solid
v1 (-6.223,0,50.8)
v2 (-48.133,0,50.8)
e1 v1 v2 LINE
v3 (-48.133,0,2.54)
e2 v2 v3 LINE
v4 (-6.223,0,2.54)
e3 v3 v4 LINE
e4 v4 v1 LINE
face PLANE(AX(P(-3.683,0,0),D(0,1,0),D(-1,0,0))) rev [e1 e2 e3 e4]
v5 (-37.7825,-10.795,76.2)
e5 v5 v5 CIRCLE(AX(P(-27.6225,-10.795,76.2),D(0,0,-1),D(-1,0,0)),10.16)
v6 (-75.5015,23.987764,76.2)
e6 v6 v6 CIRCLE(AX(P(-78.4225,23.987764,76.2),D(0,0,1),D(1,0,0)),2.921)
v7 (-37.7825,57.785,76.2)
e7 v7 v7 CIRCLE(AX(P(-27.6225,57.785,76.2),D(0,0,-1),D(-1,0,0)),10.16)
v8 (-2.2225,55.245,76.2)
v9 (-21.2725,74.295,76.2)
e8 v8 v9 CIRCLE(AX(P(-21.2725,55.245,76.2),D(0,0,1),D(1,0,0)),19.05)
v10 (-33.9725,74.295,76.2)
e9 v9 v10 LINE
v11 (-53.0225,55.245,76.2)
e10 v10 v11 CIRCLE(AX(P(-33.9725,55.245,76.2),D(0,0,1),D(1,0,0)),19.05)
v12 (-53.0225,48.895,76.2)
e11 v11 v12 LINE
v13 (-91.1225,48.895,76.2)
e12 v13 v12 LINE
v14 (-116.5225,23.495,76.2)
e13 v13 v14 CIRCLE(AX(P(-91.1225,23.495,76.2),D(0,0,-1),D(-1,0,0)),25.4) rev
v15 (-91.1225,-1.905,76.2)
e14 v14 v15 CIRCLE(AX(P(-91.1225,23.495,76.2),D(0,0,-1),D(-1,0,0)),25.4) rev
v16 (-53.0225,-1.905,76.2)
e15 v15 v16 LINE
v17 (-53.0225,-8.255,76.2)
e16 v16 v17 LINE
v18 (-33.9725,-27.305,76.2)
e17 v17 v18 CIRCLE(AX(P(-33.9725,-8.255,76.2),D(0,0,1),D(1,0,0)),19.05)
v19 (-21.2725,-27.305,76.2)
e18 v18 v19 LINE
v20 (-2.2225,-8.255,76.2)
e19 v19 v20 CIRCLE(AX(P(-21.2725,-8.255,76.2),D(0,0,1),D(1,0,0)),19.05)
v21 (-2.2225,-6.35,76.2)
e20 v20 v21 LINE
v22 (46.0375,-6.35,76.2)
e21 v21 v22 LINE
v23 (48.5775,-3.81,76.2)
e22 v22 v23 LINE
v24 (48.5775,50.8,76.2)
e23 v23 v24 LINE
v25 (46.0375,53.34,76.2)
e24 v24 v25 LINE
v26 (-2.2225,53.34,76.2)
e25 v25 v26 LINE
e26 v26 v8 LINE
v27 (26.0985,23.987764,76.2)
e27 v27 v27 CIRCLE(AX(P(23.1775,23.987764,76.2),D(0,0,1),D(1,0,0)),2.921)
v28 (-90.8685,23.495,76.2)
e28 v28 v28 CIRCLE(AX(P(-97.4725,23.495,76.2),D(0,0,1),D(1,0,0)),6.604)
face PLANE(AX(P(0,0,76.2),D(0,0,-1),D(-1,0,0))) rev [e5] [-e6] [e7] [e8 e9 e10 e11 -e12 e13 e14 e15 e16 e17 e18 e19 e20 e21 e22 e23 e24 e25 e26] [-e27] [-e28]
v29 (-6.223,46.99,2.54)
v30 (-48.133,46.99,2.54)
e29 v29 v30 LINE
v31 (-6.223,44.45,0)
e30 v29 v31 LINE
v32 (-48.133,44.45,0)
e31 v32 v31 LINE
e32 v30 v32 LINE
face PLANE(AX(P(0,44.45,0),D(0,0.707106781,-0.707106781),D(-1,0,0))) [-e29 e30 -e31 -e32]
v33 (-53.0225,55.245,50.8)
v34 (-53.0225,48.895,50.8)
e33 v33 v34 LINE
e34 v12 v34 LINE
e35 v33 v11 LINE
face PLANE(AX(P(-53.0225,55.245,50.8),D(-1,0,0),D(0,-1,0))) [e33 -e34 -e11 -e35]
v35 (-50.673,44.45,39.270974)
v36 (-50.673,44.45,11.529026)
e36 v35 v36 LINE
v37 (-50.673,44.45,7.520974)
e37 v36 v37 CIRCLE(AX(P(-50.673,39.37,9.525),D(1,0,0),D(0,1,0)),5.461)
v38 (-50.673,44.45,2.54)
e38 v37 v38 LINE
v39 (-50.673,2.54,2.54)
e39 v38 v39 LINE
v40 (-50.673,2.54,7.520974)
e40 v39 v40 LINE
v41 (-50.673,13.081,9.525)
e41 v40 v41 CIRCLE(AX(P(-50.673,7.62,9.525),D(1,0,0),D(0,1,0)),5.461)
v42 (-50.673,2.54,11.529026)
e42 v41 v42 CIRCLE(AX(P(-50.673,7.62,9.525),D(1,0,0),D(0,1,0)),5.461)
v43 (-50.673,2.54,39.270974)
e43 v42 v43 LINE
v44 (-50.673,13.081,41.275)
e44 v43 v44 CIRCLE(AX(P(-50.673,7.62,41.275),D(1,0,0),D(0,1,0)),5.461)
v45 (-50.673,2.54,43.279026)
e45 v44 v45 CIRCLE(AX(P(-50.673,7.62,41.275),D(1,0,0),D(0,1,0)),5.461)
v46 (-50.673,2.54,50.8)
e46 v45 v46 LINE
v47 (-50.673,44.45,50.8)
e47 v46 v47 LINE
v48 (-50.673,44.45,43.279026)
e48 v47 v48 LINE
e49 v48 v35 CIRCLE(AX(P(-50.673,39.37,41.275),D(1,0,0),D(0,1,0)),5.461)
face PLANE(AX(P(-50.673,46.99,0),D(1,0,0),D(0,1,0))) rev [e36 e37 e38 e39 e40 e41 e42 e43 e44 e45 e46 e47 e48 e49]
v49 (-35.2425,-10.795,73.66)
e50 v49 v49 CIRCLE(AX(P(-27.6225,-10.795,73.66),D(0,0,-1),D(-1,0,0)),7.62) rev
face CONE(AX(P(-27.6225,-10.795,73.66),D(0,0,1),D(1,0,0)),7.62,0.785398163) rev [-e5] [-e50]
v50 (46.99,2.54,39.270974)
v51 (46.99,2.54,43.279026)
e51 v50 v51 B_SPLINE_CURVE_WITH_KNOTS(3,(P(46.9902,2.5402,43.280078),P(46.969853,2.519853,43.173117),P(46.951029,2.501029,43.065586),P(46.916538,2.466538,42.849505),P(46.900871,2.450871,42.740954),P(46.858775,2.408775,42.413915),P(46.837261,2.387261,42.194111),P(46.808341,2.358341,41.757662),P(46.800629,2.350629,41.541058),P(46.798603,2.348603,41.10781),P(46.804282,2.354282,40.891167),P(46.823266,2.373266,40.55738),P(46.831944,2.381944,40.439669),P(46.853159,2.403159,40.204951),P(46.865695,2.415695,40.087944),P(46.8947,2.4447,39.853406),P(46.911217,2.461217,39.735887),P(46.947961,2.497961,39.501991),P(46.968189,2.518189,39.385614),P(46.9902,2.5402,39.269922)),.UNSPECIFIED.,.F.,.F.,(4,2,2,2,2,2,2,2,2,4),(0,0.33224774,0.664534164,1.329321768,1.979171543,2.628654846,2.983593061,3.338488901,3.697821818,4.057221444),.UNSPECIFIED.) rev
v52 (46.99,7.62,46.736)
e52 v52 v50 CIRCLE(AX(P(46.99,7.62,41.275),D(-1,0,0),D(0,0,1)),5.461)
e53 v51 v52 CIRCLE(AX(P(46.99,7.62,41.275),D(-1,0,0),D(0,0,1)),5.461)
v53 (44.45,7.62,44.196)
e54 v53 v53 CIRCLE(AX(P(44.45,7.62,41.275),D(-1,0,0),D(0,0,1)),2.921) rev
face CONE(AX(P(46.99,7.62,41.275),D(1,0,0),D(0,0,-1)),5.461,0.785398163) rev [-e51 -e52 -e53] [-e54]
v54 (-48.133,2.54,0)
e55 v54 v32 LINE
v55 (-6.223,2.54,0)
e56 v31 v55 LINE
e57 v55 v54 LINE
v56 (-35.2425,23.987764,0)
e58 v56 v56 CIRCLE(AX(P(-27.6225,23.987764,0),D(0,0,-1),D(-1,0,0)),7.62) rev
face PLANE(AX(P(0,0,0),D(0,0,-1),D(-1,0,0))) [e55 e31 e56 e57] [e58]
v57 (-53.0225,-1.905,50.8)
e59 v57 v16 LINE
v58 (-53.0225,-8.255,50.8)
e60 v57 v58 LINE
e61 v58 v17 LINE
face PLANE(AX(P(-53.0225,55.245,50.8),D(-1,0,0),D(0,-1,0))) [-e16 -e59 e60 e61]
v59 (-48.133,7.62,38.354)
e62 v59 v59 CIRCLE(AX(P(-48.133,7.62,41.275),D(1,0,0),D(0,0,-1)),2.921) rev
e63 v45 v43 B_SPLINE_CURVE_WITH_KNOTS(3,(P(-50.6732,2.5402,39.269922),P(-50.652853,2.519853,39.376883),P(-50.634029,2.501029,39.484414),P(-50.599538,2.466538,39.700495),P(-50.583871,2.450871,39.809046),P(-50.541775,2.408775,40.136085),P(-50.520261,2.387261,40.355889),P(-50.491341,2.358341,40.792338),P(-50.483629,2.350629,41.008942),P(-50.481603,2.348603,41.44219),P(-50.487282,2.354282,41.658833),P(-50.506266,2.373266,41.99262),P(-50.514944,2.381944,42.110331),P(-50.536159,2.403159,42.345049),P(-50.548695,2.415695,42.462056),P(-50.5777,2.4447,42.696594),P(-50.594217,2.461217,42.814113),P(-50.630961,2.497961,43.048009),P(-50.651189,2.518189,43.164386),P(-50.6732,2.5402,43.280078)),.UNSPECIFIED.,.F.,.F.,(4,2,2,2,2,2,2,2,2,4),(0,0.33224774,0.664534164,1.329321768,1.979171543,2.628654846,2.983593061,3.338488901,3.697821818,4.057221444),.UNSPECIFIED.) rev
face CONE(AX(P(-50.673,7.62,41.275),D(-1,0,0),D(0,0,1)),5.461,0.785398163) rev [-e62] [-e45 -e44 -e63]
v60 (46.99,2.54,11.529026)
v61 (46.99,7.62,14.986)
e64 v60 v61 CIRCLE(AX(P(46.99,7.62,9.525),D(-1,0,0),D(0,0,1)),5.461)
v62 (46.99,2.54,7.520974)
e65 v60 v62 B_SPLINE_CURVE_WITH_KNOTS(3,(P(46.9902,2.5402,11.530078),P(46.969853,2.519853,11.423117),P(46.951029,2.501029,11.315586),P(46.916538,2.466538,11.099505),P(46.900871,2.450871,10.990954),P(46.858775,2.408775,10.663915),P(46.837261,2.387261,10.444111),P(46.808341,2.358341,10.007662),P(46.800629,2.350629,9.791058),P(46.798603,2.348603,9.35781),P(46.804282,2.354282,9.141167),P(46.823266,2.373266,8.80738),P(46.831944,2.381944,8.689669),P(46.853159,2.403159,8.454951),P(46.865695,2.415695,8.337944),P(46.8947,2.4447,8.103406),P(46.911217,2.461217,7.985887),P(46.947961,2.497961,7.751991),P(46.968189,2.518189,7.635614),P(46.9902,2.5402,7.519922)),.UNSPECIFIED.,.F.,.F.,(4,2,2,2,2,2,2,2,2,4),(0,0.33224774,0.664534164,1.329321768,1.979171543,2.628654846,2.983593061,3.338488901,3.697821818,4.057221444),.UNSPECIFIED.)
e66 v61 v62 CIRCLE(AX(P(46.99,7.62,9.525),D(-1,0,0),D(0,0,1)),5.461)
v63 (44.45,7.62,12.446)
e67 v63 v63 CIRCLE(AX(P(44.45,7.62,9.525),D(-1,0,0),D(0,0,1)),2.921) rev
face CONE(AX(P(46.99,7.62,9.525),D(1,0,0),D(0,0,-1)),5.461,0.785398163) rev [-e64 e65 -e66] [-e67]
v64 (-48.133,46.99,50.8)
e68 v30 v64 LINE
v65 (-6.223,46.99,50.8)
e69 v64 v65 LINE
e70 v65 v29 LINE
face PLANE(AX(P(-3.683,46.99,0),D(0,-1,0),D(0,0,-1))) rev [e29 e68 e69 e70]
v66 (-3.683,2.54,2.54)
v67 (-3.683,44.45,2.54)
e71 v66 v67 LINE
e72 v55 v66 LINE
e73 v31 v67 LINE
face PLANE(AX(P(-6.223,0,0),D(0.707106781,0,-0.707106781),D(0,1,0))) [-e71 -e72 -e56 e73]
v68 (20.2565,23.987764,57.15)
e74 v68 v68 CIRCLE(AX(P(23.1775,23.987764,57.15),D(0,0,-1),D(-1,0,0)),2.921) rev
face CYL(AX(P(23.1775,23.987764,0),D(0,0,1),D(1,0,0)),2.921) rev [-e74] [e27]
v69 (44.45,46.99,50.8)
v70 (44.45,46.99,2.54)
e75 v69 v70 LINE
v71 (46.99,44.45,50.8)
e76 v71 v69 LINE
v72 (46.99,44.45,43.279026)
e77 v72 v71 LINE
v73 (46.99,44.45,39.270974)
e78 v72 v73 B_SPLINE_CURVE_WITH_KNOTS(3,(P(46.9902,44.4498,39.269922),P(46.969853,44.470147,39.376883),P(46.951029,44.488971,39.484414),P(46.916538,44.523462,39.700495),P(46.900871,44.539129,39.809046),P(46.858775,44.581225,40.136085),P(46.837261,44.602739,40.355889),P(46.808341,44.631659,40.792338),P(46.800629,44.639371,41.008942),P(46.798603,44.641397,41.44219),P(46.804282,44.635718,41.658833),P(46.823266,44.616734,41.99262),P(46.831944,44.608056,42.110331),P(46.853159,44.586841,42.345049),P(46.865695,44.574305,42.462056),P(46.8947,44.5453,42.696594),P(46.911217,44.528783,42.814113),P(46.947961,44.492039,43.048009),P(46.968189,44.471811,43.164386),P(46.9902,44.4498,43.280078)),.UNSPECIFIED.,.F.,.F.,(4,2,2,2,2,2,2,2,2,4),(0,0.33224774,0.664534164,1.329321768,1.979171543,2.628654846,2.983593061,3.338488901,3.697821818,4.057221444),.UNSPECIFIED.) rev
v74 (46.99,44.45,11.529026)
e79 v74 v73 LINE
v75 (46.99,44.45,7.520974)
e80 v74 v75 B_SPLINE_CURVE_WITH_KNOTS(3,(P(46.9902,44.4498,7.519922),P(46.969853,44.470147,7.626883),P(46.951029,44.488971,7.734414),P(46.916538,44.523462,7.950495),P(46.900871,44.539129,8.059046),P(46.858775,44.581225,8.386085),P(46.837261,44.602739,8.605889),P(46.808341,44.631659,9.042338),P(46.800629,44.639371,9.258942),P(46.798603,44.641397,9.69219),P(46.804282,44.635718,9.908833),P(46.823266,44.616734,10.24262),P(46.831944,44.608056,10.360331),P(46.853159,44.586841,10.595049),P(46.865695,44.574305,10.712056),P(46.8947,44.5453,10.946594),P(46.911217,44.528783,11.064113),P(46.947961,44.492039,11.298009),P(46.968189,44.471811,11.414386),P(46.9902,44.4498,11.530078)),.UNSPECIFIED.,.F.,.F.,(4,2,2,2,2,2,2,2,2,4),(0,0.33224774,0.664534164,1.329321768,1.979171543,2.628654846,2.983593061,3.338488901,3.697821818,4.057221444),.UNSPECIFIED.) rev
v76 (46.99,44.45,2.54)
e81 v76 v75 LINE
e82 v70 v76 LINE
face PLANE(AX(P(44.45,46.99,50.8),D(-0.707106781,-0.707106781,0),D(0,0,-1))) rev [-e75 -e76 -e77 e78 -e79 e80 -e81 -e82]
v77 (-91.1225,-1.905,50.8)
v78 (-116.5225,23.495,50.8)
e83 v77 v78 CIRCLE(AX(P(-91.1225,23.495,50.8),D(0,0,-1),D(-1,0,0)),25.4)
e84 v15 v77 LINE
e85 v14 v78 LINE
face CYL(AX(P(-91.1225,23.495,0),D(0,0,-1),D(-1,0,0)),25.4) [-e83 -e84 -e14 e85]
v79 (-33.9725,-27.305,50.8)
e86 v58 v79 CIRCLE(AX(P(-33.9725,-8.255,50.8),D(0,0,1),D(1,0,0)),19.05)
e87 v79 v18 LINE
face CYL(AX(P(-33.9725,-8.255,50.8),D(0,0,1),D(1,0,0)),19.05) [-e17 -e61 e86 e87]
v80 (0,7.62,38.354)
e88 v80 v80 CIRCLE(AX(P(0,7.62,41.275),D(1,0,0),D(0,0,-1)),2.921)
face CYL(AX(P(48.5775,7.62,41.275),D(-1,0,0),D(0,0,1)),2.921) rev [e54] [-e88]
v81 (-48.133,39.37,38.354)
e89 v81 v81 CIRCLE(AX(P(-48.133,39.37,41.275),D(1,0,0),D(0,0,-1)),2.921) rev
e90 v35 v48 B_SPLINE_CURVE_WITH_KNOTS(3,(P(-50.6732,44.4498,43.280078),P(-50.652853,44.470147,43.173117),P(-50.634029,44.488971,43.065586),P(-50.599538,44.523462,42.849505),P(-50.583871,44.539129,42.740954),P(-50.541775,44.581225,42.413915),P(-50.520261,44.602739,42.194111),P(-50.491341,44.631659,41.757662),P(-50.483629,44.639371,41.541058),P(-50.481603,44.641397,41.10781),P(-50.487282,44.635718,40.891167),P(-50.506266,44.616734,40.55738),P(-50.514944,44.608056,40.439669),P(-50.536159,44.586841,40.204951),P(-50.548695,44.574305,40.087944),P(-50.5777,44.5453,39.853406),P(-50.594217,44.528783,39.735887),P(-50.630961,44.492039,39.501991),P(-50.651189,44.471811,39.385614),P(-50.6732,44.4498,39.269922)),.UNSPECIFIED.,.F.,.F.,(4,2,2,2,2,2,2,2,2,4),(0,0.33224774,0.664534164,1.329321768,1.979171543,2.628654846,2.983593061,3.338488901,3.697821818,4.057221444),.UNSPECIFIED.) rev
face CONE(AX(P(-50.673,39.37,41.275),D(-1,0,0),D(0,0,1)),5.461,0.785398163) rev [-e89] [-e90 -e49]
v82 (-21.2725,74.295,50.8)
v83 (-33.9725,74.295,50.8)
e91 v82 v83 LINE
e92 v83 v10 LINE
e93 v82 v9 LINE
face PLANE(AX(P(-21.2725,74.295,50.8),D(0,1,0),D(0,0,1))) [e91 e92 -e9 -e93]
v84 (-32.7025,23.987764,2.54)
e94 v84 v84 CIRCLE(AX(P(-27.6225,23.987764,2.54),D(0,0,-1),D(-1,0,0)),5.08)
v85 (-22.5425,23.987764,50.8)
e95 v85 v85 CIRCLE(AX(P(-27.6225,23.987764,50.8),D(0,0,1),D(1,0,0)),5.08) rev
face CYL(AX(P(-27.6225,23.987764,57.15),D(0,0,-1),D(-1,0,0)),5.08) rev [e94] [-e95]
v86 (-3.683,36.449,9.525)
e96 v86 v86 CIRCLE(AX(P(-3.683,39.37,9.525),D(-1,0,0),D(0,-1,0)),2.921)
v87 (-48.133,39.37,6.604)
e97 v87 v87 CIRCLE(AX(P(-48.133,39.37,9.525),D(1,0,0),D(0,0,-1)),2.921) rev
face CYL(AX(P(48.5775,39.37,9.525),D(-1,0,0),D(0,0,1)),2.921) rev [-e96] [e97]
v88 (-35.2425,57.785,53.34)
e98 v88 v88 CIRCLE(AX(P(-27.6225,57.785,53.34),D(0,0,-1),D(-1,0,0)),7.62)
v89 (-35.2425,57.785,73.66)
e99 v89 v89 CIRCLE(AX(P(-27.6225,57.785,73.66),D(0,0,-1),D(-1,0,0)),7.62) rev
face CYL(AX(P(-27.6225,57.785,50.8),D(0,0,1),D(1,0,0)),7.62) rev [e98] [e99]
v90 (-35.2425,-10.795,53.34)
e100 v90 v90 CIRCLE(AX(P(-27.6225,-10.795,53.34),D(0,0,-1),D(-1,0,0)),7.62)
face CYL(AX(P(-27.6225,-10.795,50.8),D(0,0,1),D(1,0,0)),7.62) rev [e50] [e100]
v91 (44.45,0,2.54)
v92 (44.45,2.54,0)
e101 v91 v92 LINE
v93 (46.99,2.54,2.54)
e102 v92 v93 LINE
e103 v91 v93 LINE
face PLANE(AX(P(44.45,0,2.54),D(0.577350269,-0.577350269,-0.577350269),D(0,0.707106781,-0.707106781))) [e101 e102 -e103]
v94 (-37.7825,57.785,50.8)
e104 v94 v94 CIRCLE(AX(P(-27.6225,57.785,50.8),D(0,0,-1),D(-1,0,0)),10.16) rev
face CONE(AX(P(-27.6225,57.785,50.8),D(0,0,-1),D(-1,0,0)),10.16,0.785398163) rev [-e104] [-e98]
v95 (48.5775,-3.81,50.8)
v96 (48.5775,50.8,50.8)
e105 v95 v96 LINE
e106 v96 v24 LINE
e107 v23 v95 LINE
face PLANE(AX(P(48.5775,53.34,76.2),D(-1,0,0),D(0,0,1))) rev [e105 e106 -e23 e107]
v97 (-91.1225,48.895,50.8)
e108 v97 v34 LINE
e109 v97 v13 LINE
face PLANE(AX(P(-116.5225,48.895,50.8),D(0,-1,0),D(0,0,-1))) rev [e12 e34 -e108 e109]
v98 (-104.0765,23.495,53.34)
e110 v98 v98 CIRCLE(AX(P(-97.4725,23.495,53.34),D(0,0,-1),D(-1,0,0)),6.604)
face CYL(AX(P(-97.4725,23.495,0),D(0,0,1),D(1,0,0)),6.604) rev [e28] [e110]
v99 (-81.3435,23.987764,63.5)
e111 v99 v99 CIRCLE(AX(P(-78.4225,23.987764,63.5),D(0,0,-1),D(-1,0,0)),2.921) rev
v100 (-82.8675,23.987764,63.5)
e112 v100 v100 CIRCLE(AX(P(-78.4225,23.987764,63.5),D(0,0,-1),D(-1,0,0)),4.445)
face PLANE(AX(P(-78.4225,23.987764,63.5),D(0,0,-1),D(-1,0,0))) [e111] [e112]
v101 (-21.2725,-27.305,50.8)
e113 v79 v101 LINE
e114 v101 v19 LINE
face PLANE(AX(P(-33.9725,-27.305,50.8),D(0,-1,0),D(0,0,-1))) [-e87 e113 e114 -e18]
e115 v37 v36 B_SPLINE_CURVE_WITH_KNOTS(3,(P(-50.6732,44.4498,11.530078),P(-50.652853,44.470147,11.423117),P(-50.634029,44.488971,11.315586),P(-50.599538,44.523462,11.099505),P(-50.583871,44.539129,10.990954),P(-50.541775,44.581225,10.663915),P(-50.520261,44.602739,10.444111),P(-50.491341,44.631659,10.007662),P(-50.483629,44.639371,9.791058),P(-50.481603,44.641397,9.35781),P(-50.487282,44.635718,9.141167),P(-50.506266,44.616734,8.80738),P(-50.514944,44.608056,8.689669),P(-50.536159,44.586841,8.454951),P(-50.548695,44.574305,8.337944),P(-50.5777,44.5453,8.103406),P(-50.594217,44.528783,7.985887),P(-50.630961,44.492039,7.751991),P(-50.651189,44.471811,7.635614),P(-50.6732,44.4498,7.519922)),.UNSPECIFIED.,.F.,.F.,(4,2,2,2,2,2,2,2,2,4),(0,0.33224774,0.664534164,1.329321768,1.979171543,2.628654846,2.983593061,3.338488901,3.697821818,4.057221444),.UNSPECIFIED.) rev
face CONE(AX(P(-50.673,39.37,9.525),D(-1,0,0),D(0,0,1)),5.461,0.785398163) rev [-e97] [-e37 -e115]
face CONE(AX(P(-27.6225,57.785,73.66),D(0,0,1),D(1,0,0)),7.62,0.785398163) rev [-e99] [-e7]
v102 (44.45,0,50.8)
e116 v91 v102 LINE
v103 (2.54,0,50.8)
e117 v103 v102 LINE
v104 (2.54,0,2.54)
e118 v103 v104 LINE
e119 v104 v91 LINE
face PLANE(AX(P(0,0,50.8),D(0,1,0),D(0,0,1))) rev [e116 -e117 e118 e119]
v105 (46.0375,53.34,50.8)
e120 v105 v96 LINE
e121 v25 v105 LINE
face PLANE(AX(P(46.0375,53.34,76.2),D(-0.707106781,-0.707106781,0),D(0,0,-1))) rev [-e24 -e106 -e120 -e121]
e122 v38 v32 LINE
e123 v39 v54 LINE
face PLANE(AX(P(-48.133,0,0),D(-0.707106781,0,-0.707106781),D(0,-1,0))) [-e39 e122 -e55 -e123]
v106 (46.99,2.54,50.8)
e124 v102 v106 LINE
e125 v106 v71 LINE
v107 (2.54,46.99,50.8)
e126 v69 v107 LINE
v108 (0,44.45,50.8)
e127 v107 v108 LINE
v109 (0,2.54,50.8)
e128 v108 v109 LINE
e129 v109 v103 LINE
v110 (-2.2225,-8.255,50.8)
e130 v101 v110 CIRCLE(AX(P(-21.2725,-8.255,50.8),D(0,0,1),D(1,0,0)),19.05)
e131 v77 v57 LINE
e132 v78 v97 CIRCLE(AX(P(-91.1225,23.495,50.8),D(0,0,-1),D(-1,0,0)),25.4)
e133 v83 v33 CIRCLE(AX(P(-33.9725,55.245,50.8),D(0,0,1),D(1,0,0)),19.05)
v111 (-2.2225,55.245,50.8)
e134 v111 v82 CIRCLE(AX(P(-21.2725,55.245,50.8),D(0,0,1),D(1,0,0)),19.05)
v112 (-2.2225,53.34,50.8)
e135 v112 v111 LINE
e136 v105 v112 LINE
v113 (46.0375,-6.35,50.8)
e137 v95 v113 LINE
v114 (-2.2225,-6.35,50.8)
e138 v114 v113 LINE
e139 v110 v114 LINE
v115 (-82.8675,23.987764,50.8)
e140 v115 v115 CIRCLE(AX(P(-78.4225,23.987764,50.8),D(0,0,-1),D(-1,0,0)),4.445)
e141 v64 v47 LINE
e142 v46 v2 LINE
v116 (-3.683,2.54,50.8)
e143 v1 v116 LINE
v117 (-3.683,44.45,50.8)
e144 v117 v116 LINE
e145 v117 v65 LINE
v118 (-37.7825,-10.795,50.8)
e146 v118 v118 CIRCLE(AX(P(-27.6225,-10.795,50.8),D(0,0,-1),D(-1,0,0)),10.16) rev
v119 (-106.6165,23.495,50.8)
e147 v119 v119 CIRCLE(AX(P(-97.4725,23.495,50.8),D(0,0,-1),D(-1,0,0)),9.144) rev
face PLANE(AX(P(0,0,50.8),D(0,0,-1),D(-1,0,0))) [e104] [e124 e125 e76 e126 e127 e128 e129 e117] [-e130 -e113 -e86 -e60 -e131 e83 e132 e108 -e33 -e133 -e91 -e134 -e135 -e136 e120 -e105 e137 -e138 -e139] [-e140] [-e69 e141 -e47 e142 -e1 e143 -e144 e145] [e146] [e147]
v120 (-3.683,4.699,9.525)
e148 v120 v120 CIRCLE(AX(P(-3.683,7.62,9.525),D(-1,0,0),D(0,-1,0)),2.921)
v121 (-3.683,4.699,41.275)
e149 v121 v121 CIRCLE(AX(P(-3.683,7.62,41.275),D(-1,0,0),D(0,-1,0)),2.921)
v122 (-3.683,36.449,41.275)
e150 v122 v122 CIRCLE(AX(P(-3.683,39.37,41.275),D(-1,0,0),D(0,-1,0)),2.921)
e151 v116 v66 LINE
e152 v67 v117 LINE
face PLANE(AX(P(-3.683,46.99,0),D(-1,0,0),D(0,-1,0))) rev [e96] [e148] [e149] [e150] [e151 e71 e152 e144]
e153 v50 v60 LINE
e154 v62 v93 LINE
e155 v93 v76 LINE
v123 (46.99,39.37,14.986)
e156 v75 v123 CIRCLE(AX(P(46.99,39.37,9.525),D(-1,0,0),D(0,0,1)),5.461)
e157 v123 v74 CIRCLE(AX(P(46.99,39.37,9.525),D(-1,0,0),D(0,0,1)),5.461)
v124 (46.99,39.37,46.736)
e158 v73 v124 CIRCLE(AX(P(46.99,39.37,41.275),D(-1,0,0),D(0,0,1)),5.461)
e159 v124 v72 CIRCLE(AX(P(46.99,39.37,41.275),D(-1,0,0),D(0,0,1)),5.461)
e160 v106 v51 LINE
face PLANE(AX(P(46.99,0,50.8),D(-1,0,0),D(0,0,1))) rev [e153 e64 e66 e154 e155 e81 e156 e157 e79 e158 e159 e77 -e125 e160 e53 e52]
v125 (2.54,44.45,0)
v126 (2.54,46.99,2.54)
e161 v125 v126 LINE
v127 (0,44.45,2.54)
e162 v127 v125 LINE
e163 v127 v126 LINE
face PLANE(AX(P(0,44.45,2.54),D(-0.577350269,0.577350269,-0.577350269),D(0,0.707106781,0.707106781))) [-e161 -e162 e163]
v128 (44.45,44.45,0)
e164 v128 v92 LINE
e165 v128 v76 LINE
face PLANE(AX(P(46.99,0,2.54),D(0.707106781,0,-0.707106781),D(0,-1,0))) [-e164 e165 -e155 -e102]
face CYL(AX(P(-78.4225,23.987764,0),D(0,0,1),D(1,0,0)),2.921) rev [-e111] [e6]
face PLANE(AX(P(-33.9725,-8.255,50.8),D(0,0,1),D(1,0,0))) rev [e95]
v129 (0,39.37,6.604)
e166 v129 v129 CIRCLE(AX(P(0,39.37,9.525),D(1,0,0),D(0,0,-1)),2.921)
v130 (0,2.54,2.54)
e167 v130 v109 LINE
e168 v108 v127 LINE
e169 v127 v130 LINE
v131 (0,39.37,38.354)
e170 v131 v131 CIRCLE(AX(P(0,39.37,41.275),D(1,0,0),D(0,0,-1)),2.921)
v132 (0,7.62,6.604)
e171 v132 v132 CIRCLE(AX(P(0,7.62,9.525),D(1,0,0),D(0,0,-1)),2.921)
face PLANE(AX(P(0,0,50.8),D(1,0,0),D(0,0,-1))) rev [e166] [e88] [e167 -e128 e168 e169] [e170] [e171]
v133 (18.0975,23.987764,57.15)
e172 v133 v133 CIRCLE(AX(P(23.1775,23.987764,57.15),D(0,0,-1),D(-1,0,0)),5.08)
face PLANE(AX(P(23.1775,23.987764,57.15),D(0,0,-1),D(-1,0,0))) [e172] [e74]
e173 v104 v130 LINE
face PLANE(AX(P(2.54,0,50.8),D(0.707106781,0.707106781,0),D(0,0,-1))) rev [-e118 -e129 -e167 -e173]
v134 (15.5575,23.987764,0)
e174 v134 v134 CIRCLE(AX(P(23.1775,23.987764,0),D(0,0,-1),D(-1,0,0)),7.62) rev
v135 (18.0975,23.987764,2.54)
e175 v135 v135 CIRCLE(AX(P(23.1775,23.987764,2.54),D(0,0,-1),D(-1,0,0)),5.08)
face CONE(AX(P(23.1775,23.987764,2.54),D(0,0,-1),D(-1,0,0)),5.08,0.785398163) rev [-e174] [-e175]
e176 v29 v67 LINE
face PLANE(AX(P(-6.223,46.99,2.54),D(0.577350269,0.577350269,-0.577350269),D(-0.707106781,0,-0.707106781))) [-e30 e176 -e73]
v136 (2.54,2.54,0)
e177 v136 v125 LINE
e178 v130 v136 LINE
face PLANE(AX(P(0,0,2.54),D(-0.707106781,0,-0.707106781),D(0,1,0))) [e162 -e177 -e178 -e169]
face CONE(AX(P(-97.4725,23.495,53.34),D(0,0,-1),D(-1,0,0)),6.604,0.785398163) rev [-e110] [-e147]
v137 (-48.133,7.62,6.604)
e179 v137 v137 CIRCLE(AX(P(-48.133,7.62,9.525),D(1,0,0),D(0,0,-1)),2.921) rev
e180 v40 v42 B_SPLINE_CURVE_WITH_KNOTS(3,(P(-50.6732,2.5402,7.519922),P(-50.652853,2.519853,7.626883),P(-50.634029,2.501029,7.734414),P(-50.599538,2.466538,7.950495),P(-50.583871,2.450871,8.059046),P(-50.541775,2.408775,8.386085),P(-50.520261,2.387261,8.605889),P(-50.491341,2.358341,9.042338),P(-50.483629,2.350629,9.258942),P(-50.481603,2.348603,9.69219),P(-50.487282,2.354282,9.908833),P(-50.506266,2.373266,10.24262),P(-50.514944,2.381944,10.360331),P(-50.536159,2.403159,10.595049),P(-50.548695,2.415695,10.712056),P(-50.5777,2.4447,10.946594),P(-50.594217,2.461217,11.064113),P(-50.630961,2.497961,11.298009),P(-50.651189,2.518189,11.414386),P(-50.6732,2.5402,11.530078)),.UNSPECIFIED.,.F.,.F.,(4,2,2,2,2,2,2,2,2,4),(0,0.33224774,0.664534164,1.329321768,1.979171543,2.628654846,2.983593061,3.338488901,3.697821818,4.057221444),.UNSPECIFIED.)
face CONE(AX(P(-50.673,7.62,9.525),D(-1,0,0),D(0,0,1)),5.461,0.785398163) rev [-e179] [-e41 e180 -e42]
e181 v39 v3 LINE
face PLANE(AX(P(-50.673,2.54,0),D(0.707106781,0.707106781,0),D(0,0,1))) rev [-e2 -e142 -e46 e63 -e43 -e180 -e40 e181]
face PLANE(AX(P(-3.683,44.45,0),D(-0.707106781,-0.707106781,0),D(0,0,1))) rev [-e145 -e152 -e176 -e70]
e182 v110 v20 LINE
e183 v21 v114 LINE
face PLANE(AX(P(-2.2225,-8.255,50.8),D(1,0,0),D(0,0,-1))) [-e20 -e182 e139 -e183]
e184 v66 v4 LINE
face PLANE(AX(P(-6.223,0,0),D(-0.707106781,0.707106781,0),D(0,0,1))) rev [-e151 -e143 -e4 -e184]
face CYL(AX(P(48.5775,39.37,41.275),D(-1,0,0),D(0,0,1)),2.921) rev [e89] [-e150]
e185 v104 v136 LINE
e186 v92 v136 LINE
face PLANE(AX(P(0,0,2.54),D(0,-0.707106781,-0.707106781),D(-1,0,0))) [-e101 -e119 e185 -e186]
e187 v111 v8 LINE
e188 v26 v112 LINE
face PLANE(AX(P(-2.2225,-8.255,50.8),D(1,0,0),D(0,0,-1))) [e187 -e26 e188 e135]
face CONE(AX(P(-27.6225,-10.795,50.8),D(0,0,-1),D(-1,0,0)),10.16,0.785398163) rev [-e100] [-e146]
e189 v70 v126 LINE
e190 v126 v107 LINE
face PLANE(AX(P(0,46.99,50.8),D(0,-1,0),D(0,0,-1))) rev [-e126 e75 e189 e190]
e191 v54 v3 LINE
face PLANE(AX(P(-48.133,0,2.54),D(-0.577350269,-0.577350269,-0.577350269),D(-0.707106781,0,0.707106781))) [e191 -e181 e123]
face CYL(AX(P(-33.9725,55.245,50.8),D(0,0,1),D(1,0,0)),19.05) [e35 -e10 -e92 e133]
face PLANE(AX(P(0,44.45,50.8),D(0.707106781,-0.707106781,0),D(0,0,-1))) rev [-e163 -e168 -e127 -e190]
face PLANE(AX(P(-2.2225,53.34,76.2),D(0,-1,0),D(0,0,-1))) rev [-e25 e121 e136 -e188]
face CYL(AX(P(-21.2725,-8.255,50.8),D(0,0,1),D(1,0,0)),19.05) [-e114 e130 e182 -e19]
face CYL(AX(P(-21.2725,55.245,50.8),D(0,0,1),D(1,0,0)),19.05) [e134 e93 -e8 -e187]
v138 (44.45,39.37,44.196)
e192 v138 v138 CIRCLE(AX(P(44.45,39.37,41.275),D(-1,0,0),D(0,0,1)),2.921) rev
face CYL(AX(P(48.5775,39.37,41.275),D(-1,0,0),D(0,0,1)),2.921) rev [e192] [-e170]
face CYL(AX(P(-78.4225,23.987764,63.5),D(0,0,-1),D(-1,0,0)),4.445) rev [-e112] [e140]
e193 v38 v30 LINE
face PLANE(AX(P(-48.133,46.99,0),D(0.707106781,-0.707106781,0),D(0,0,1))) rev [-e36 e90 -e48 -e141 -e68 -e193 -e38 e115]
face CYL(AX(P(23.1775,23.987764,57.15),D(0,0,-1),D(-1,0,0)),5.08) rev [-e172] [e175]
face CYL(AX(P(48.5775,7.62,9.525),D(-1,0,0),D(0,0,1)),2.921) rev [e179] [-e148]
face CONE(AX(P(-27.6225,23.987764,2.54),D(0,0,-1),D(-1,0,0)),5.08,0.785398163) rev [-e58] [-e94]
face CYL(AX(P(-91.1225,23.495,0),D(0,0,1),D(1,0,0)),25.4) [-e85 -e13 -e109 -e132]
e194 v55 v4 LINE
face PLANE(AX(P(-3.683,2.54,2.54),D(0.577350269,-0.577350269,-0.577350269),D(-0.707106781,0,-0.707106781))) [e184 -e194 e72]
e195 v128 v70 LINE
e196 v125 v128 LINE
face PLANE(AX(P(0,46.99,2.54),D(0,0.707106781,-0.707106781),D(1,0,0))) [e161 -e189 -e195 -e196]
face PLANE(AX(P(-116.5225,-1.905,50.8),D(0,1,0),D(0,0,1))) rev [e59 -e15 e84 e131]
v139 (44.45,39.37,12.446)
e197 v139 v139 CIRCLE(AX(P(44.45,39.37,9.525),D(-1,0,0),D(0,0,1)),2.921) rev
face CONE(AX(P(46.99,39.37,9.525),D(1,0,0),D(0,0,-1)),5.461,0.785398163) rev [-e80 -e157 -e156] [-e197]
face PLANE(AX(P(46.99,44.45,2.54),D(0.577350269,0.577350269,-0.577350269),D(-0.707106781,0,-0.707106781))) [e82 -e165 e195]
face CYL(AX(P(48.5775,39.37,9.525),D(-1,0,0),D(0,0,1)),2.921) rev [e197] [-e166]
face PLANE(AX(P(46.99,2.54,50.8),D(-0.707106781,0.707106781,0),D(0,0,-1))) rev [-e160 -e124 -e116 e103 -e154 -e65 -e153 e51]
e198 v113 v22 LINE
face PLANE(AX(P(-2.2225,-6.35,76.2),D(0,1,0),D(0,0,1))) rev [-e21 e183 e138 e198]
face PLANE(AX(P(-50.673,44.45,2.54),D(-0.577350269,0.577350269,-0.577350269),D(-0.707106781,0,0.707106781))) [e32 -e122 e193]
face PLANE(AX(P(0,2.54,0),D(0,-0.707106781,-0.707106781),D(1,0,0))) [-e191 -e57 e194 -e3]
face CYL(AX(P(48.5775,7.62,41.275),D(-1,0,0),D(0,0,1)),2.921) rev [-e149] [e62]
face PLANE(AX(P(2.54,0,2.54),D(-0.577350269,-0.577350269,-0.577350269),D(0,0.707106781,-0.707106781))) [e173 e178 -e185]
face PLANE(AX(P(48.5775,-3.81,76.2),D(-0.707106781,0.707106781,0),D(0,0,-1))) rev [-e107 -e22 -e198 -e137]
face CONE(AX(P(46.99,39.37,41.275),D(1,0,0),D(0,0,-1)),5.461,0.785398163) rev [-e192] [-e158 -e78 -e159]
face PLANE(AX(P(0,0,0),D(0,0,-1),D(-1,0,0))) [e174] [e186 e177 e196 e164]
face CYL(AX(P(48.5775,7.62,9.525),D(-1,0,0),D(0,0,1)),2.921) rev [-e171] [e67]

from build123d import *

# Parameters (mm, degrees)
SKETCH1_W               = 46.99
SKETCH1_H               = 46.99
BOSS_EXTRUDE2_DEPTH     = 50.8
SKETCH3_W               = 50.8
SKETCH3_H               = 59.69
BOSS_EXTRUDE3_DEPTH     = 25.4
SKETCH8_W               = 25.4
SKETCH8_H               = 50.8
BOSS_EXTRUDE4_DEPTH     = 114.3
SKETCH9_W               = 46.99
SKETCH9_H               = 46.99
BOSS_EXTRUDE5_DEPTH     = 50.8
CUT_EXTRUDE4_DEPTH      = 150.094227273
CUT_EXTRUDE4_DEPTH_BACK = 150.094227273
SKETCH4_R               = 2.921
SKETCH10_R              = 6.604
CUT_EXTRUDE5_DEPTH      = 150.094227273
FILLET2_R               = 25.4
SKETCH11_R              = 2.921
CUT_EXTRUDE6_DEPTH      = 150.094227273
SKETCH12_R              = 5.08
CUT_EXTRUDE7_DEPTH      = 57.15
SKETCH15_R              = 4.445
CUT_EXTRUDE8_DEPTH      = 12.7
SKETCH16_R              = 7.62
BOSS_EXTRUDE6_DEPTH     = 25.4


# Some blends are built 0.0001 mm under size
with BuildPart() as part:
    # Sketch1 → Boss-Extrude2 (new body)
    with BuildSketch(Plane.XY):
        with Locations((23.495, 23.495)):
            Rectangle(SKETCH1_W, SKETCH1_H)
    extrude(amount=BOSS_EXTRUDE2_DEPTH)

    # Sketch3 → Boss-Extrude3 (add)
    with BuildSketch(Plane.XY.offset(50.8)):
        with Locations((23.1775, 23.495)):
            Rectangle(SKETCH3_W, SKETCH3_H)
    extrude(amount=BOSS_EXTRUDE3_DEPTH)

    # Sketch8 → Boss-Extrude4 (add)
    with BuildSketch(Plane.ZY.offset(2.2225)):
        with Locations((63.5, 23.495)):
            Rectangle(SKETCH8_W, SKETCH8_H)
    extrude(amount=BOSS_EXTRUDE4_DEPTH)

    # Sketch9 → Boss-Extrude5 (add)
    with BuildSketch(Plane(origin=(0, 0, 50.8), x_dir=(-1, 0, 0), z_dir=(0, 0, -1))):
        with Locations((27.178, 23.495)):
            Rectangle(SKETCH9_W, SKETCH9_H)
    extrude(amount=BOSS_EXTRUDE5_DEPTH)

    # Sketch4 → Cut-Extrude4 (cut, two sides: drawn at the far end of the back side and taken through both)
    with BuildSketch(Plane.ZY.offset(-CUT_EXTRUDE4_DEPTH_BACK)):
        with Locations(Location((41.275, 39.37, 0), (0, 0, 90))):
            Circle(SKETCH4_R)
        with Locations(Location((41.275, 7.62, 0), (0, 0, 90))):
            Circle(SKETCH4_R)
        with Locations(Location((9.525, 7.62, 0), (0, 0, 90))):
            Circle(SKETCH4_R)
        with Locations(Location((9.525, 39.37, 0), (0, 0, 90))):
            Circle(SKETCH4_R)
    extrude(amount=CUT_EXTRUDE4_DEPTH + CUT_EXTRUDE4_DEPTH_BACK, mode=Mode.SUBTRACT)

    # Sketch10 → Cut-Extrude5 (cut, through all)
    with BuildSketch(Plane.XY.offset(76.2)):
        with Locations((-97.4725, 23.495)):
            Circle(SKETCH10_R)
    extrude(amount=-CUT_EXTRUDE5_DEPTH, mode=Mode.SUBTRACT)

    # Fillet2
    fillet2_edges = [part.edges().sort_by_distance(p)[0] for p in [
        (-116.5225, -1.905, 63.5),
        (-116.5225, 48.895, 63.5),
    ]]
    fillet(fillet2_edges, radius=FILLET2_R - 0.0001)  # a hair under: the kernel refuses the full size

    # Sketch11 → Cut-Extrude6 (cut, through all)
    with BuildSketch(Plane.XY.offset(76.2)):
        with Locations((23.1775, 23.987763641)):
            Circle(SKETCH11_R)
        with Locations((-27.6225, 23.987763641)):
            Circle(SKETCH11_R)
        with Locations((-78.4225, 23.987763641)):
            Circle(SKETCH11_R)
    extrude(amount=-CUT_EXTRUDE6_DEPTH, mode=Mode.SUBTRACT)

    # Sketch12 → Cut-Extrude7 (cut)
    with BuildSketch(Plane(origin=(0, 0, 0), x_dir=(-1, 0, 0), z_dir=(0, 0, -1))):
        with Locations((-23.1775, 23.987763641)):
            Circle(SKETCH12_R)
        with Locations((27.6225, 23.987763641)):
            Circle(SKETCH12_R)
    extrude(amount=-CUT_EXTRUDE7_DEPTH, mode=Mode.SUBTRACT)

    # Sketch15 → Cut-Extrude8 (cut)
    with BuildSketch(Plane(origin=(0, 0, 50.8), x_dir=(-1, 0, 0), z_dir=(0, 0, -1))):
        with Locations((78.4225, 23.987763641)):
            Circle(SKETCH15_R)
    extrude(amount=-CUT_EXTRUDE8_DEPTH, mode=Mode.SUBTRACT)

    # Sketch16 → Boss-Extrude6 (add)
    with BuildSketch(Plane.XY.offset(76.2)):
        with BuildLine():
            Line((-21.2725, 74.295), (-33.9725, 74.295))
            ThreePointArc((-33.9725, 74.295), (-47.442884182, 68.715384182), (-53.0225, 55.245))
            Line((-53.0225, 55.245), (-53.0225, -8.255))
            ThreePointArc((-53.0225, -8.255), (-47.442884182, -21.725384182), (-33.9725, -27.305))
            Line((-33.9725, -27.305), (-21.2725, -27.305))
            ThreePointArc((-21.2725, -27.305), (-7.802115818, -21.725384182), (-2.2225, -8.255))
            Line((-2.2225, -8.255), (-2.2225, 55.245))
            ThreePointArc((-2.2225, 55.245), (-7.802115818, 68.715384182), (-21.2725, 74.295))
        make_face()
        with Locations((-27.6225, 57.785)):
            Circle(SKETCH16_R, mode=Mode.SUBTRACT)
        with Locations((-27.6225, -10.795)):
            Circle(SKETCH16_R, mode=Mode.SUBTRACT)
    extrude(amount=-BOSS_EXTRUDE6_DEPTH)

    # Chamfer1
    # the kernel refuses this chamfer: 2.54 mm, written as the material it takes off along each edge
    with BuildSketch(Plane(origin=(-5.376333333, 45.296666667, 1.693333333), x_dir=(0.7071067811865476, -0.7071067811865476, 0), z_dir=(0.5773502691896255, 0.5773502691896256, -0.577350269189626)), Plane(origin=(-5.376333333, 1.693333333, 1.693333333), x_dir=(-0.7071067811865475, -0.7071067811865476, 0), z_dir=(0.5773502691896258, -0.5773502691896256, -0.577350269189626)), Plane(origin=(1.693333333, 45.296666667, 1.693333333), x_dir=(0.7071067811865476, 0.7071067811865475, 0), z_dir=(-0.5773502691896258, 0.577350269189626, -0.5773502691896255)), Plane(origin=(1.693333333, 1.693333333, 1.693333333), x_dir=(-0.7071067811865477, 0.7071067811865474, 0), z_dir=(-0.5773502691896258, -0.577350269189626, -0.5773502691896255))) as chamfer1_piece_1:
        Polygon((-1.796051224, -1.036950658), (1.796051224, -1.036950658), (0, 2.073901316), align=None)
    extrude(amount=3.226233304, mode=Mode.SUBTRACT)
    with BuildSketch(Plane(origin=(-48.979666667, 1.693333333, 1.693333333), x_dir=(0.7071067811865474, -0.7071067811865478, 0), z_dir=(-0.5773502691896261, -0.5773502691896255, -0.5773502691896257)), Plane(origin=(-48.979666667, 45.296666667, 1.693333333), x_dir=(-0.7071067811865476, -0.7071067811865476, 0), z_dir=(-0.5773502691896257, 0.5773502691896257, -0.5773502691896257)), Plane(origin=(45.296666667, 45.296666667, 1.693333333), x_dir=(-0.7071067811865476, 0.7071067811865476, 0), z_dir=(0.5773502691896258, 0.5773502691896258, -0.5773502691896255)), Plane(origin=(45.296666667, 1.693333333, 1.693333333), x_dir=(0.7071067811865474, 0.7071067811865477, 0), z_dir=(0.5773502691896261, -0.5773502691896257, -0.5773502691896255))) as chamfer1_piece_2:
        Polygon((-1.796051224, 1.036950658), (1.796051224, 1.036950658), (0, -2.073901316), align=None)
    extrude(amount=3.226233304, mode=Mode.SUBTRACT)
    with BuildSketch(Plane(origin=(23.1775, 23.987763641, 0), x_dir=(-1, 0, 0), z_dir=(0, -1, 0))) as chamfer1_piece_3:
        with BuildLine():
            Line((7.691842049, 0.071842049), (5.008157951, -2.611842049))
            Line((5.008157951, -2.611842049), (4.957357951, -2.611842049))
            ThreePointArc((4.957357951, -2.611842049), (5.0292, -1.305921024), (5.0292, 0))
            Line((5.0292, 0), (5.08, 0.0508))
            ThreePointArc((5.08, 0.0508), (6.385921024, 0.0508), (7.691842049, 0.122642049))
            Line((7.691842049, 0.122642049), (7.691842049, 0.071842049))
        make_face()
    revolve(axis=Axis((23.1775, 23.987763641, 0), (0, 0, -1)), mode=Mode.SUBTRACT)
    with BuildSketch(Plane(origin=(-27.6225, 23.987763641, 0), x_dir=(-1, 0, 0), z_dir=(0, -1, 0))) as chamfer1_piece_4:
        with BuildLine():
            Line((7.691842049, 0.071842049), (5.008157951, -2.611842049))
            Line((5.008157951, -2.611842049), (4.957357951, -2.611842049))
            ThreePointArc((4.957357951, -2.611842049), (5.0292, -1.305921024), (5.0292, 0))
            Line((5.0292, 0), (5.08, 0.0508))
            ThreePointArc((5.08, 0.0508), (6.385921024, 0.0508), (7.691842049, 0.122642049))
            Line((7.691842049, 0.122642049), (7.691842049, 0.071842049))
        make_face()
    revolve(axis=Axis((-27.6225, 23.987763641, 0), (0, 0, -1)), mode=Mode.SUBTRACT)
    with BuildSketch(Plane(origin=(48.5775, -6.35, 44.267925211), x_dir=(0.02749587661058728, 0.9996219169112966, 0), z_dir=(0, 0, 1)), Plane(origin=(48.5775, 53.34, 44.267925211), x_dir=(-0.9996219169112968, 0.02749587661058727, 0), z_dir=(0, 0, 1))) as chamfer1_piece_5:
        with BuildLine():
            Line((2.612829916, 0), (-0.143629773, 2.608879196))
            Line((-0.143629773, 2.608879196), (-0.194410567, 2.607482405))
            ThreePointArc((-0.194410567, 2.607482405), (-0.086688237, 1.304030487), (-0.050780793, -0.001396791))
            Line((-0.050780793, -0.001396791), (0.001396791, -0.050780793))
            ThreePointArc((0.001396791, -0.050780793), (1.306824068, -0.01487335), (2.614226706, -0.050780793))
            Line((2.614226706, -0.050780793), (2.612829916, 0))
        make_face()
    extrude(amount=38.464149579, mode=Mode.SUBTRACT)
    with BuildSketch(Plane(origin=(-27.6225, -10.795, 50.8), x_dir=(1, 0, 0), z_dir=(0, -1, 0))) as chamfer1_piece_6:
        with BuildLine():
            Line((10.231842049, -0.071842049), (7.548157951, 2.611842049))
            Line((7.548157951, 2.611842049), (7.497357951, 2.611842049))
            ThreePointArc((7.497357951, 2.611842049), (7.5692, 1.305921024), (7.5692, 0))
            Line((7.5692, 0), (7.62, -0.0508))
            ThreePointArc((7.62, -0.0508), (8.925921024, -0.0508), (10.231842049, -0.122642049))
            Line((10.231842049, -0.122642049), (10.231842049, -0.071842049))
        make_face()
    revolve(axis=Axis((-27.6225, -10.795, 50.8), (0, 0, 1)), mode=Mode.SUBTRACT)
    with BuildSketch(Plane(origin=(-27.6225, 57.785, 50.8), x_dir=(1, 0, 0), z_dir=(0, -1, 0))) as chamfer1_piece_7:
        with BuildLine():
            Line((10.231842049, -0.071842049), (7.548157951, 2.611842049))
            Line((7.548157951, 2.611842049), (7.497357951, 2.611842049))
            ThreePointArc((7.497357951, 2.611842049), (7.5692, 1.305921024), (7.5692, 0))
            Line((7.5692, 0), (7.62, -0.0508))
            ThreePointArc((7.62, -0.0508), (8.925921024, -0.0508), (10.231842049, -0.122642049))
            Line((10.231842049, -0.122642049), (10.231842049, -0.071842049))
        make_face()
    revolve(axis=Axis((-27.6225, 57.785, 50.8), (0, 0, 1)), mode=Mode.SUBTRACT)
    with BuildSketch(Plane(origin=(-27.6225, 57.785, 76.2), x_dir=(1, 0, 0), z_dir=(0, -1, 0))) as chamfer1_piece_8:
        with BuildLine():
            Line((7.548157951, -2.611842049), (10.231842049, 0.071842049))
            Line((10.231842049, 0.071842049), (10.231842049, 0.122642049))
            ThreePointArc((10.231842049, 0.122642049), (8.925921024, 0.0508), (7.62, 0.0508))
            Line((7.62, 0.0508), (7.5692, 0))
            ThreePointArc((7.5692, 0), (7.5692, -1.305921024), (7.497357951, -2.611842049))
            Line((7.497357951, -2.611842049), (7.548157951, -2.611842049))
        make_face()
    revolve(axis=Axis((-27.6225, 57.785, 76.2), (0, 0, 1)), mode=Mode.SUBTRACT)
    with BuildSketch(Plane(origin=(-27.6225, -10.795, 76.2), x_dir=(1, 0, 0), z_dir=(0, -1, 0))) as chamfer1_piece_9:
        with BuildLine():
            Line((7.548157951, -2.611842049), (10.231842049, 0.071842049))
            Line((10.231842049, 0.071842049), (10.231842049, 0.122642049))
            ThreePointArc((10.231842049, 0.122642049), (8.925921024, 0.0508), (7.62, 0.0508))
            Line((7.62, 0.0508), (7.5692, 0))
            ThreePointArc((7.5692, 0), (7.5692, -1.305921024), (7.497357951, -2.611842049))
            Line((7.497357951, -2.611842049), (7.548157951, -2.611842049))
        make_face()
    revolve(axis=Axis((-27.6225, -10.795, 76.2), (0, 0, 1)), mode=Mode.SUBTRACT)
    with BuildSketch(Plane(origin=(-3.683, 46.99, 50.8), x_dir=(-0.9996219169112968, 0.027495876610587295, 0), z_dir=(0, 0, -1)), Plane(origin=(-3.683, 0, 50.8), x_dir=(0.027495876610586605, 0.9996219169112968, 0), z_dir=(0, 0, -1)), Plane(origin=(46.99, 46.99, -6.532074789), x_dir=(0.027495876610587267, -0.9996219169112966, 0), z_dir=(0, 0, 1)), Plane(origin=(46.99, 0, -6.532074789), x_dir=(-0.9996219169112968, -0.02749587661058637, 0), z_dir=(0, 0, 1))) as chamfer1_piece_10:
        with BuildLine():
            Line((2.612829916, 0), (-0.143629773, -2.608879196))
            Line((-0.143629773, -2.608879196), (-0.194410567, -2.607482405))
            ThreePointArc((-0.194410567, -2.607482405), (-0.086688237, -1.304030487), (-0.050780793, 0.001396791))
            Line((-0.050780793, 0.001396791), (0.001396791, 0.050780793))
            ThreePointArc((0.001396791, 0.050780793), (1.306824068, 0.01487335), (2.614226706, 0.050780793))
            Line((2.614226706, 0.050780793), (2.612829916, 0))
        make_face()
    extrude(amount=57.332074789, mode=Mode.SUBTRACT)
    with BuildSketch(Plane(origin=(-50.673, 0, 50.8), x_dir=(-0.02749587661058728, 0.9996219169112968, 0), z_dir=(0, 0, -1)), Plane(origin=(-50.673, 46.99, 50.8), x_dir=(0.9996219169112968, 0.02749587661058727, 0), z_dir=(0, 0, -1)), Plane(origin=(0, 46.99, -6.532074789), x_dir=(-0.02749587661058636, -0.9996219169112968, 0), z_dir=(0, 0, 1)), Plane(origin=(0, 0, -6.532074789), x_dir=(0.9996219169112966, -0.02749587661058636, 0), z_dir=(0, 0, 1))) as chamfer1_piece_11:
        with BuildLine():
            Line((2.612829916, 0), (-0.143629773, 2.608879196))
            Line((-0.143629773, 2.608879196), (-0.194410567, 2.607482405))
            ThreePointArc((-0.194410567, 2.607482405), (-0.086688237, 1.304030487), (-0.050780793, -0.001396791))
            Line((-0.050780793, -0.001396791), (0.001396791, -0.050780793))
            ThreePointArc((0.001396791, -0.050780793), (1.306824068, -0.01487335), (2.614226706, -0.050780793))
            Line((2.614226706, -0.050780793), (2.612829916, 0))
        make_face()
    extrude(amount=57.332074789, mode=Mode.SUBTRACT)
    with BuildSketch(Plane(origin=(-3.683, -6.532074789, 0), x_dir=(0.027495876610586445, 0, 0.9996219169112968), z_dir=(0, 1, 0)), Plane(origin=(-57.205074789, 0, 0), x_dir=(0, -0.027495876610586386, 0.9996219169112968), z_dir=(1, 0, 0)), Plane(origin=(-50.673, 53.522074789, 0), x_dir=(-0.027495876610587295, 0, 0.9996219169112968), z_dir=(0, -1, 0)), Plane(origin=(2.849074789, 46.99, 0), x_dir=(0, 0.027495876610587295, 0.9996219169112968), z_dir=(-1, 0, 0)), Plane(origin=(53.522074789, 46.99, 0), x_dir=(0, 0.02749587661058728, 0.9996219169112966), z_dir=(-1, 0, 0)), Plane(origin=(46.99, -6.532074789, 0), x_dir=(0.02749587661058728, 0, 0.9996219169112966), z_dir=(0, 1, 0)), Plane(origin=(-6.532074789, 0, 0), x_dir=(0, -0.027495876610586365, 0.9996219169112968), z_dir=(1, 0, 0)), Plane(origin=(0, 53.522074789, 0), x_dir=(-0.027495876610586365, 0, 0.9996219169112968), z_dir=(0, -1, 0))) as chamfer1_piece_12:
        with BuildLine():
            Line((2.612829916, 0), (-0.143629773, -2.608879196))
            Line((-0.143629773, -2.608879196), (-0.194410567, -2.607482405))
            ThreePointArc((-0.194410567, -2.607482405), (-0.086688237, -1.304030487), (-0.050780793, 0.001396791))
            Line((-0.050780793, 0.001396791), (0.001396791, 0.050780793))
            ThreePointArc((0.001396791, 0.050780793), (1.306824068, 0.01487335), (2.614226706, 0.050780793))
            Line((2.614226706, 0.050780793), (2.612829916, 0))
        make_face()
    extrude(amount=60.054149579, mode=Mode.SUBTRACT)
    with BuildSketch(Plane(origin=(46.99, 39.37, 9.525), x_dir=(0, 1, 0), z_dir=(0, 0, 1))) as chamfer1_piece_13:
        with BuildLine():
            Line((5.532842049, -0.071842049), (2.849157951, 2.611842049))
            Line((2.849157951, 2.611842049), (2.798357951, 2.611842049))
            ThreePointArc((2.798357951, 2.611842049), (2.8702, 1.305921024), (2.8702, 0))
            Line((2.8702, 0), (2.921, -0.0508))
            ThreePointArc((2.921, -0.0508), (4.226921024, -0.0508), (5.532842049, -0.122642049))
            Line((5.532842049, -0.122642049), (5.532842049, -0.071842049))
        make_face()
    revolve(axis=Axis((46.99, 39.37, 9.525), (-1, 0, 0)), mode=Mode.SUBTRACT)
    with BuildSketch(Plane(origin=(-50.673, 39.37, 9.525), x_dir=(0, 1, 0), z_dir=(0, 0, -1))) as chamfer1_piece_14:
        with BuildLine():
            Line((5.532842049, -0.071842049), (2.849157951, 2.611842049))
            Line((2.849157951, 2.611842049), (2.798357951, 2.611842049))
            ThreePointArc((2.798357951, 2.611842049), (2.8702, 1.305921024), (2.8702, 0))
            Line((2.8702, 0), (2.921, -0.0508))
            ThreePointArc((2.921, -0.0508), (4.226921024, -0.0508), (5.532842049, -0.122642049))
            Line((5.532842049, -0.122642049), (5.532842049, -0.071842049))
        make_face()
    revolve(axis=Axis((-50.673, 39.37, 9.525), (1, 0, 0)), mode=Mode.SUBTRACT)
    with BuildSketch(Plane(origin=(46.99, 7.62, 9.525), x_dir=(0, 1, 0), z_dir=(0, 0, 1))) as chamfer1_piece_15:
        with BuildLine():
            Line((5.532842049, -0.071842049), (2.849157951, 2.611842049))
            Line((2.849157951, 2.611842049), (2.798357951, 2.611842049))
            ThreePointArc((2.798357951, 2.611842049), (2.8702, 1.305921024), (2.8702, 0))
            Line((2.8702, 0), (2.921, -0.0508))
            ThreePointArc((2.921, -0.0508), (4.226921024, -0.0508), (5.532842049, -0.122642049))
            Line((5.532842049, -0.122642049), (5.532842049, -0.071842049))
        make_face()
    revolve(axis=Axis((46.99, 7.62, 9.525), (-1, 0, 0)), mode=Mode.SUBTRACT)
    with BuildSketch(Plane(origin=(-50.673, 7.62, 9.525), x_dir=(0, 1, 0), z_dir=(0, 0, -1))) as chamfer1_piece_16:
        with BuildLine():
            Line((5.532842049, -0.071842049), (2.849157951, 2.611842049))
            Line((2.849157951, 2.611842049), (2.798357951, 2.611842049))
            ThreePointArc((2.798357951, 2.611842049), (2.8702, 1.305921024), (2.8702, 0))
            Line((2.8702, 0), (2.921, -0.0508))
            ThreePointArc((2.921, -0.0508), (4.226921024, -0.0508), (5.532842049, -0.122642049))
            Line((5.532842049, -0.122642049), (5.532842049, -0.071842049))
        make_face()
    revolve(axis=Axis((-50.673, 7.62, 9.525), (1, 0, 0)), mode=Mode.SUBTRACT)
    with BuildSketch(Plane(origin=(46.99, 7.62, 41.275), x_dir=(0, 1, 0), z_dir=(0, 0, 1))) as chamfer1_piece_17:
        with BuildLine():
            Line((5.532842049, -0.071842049), (2.849157951, 2.611842049))
            Line((2.849157951, 2.611842049), (2.798357951, 2.611842049))
            ThreePointArc((2.798357951, 2.611842049), (2.8702, 1.305921024), (2.8702, 0))
            Line((2.8702, 0), (2.921, -0.0508))
            ThreePointArc((2.921, -0.0508), (4.226921024, -0.0508), (5.532842049, -0.122642049))
            Line((5.532842049, -0.122642049), (5.532842049, -0.071842049))
        make_face()
    revolve(axis=Axis((46.99, 7.62, 41.275), (-1, 0, 0)), mode=Mode.SUBTRACT)
    with BuildSketch(Plane(origin=(-50.673, 7.62, 41.275), x_dir=(0, 1, 0), z_dir=(0, 0, -1))) as chamfer1_piece_18:
        with BuildLine():
            Line((5.532842049, -0.071842049), (2.849157951, 2.611842049))
            Line((2.849157951, 2.611842049), (2.798357951, 2.611842049))
            ThreePointArc((2.798357951, 2.611842049), (2.8702, 1.305921024), (2.8702, 0))
            Line((2.8702, 0), (2.921, -0.0508))
            ThreePointArc((2.921, -0.0508), (4.226921024, -0.0508), (5.532842049, -0.122642049))
            Line((5.532842049, -0.122642049), (5.532842049, -0.071842049))
        make_face()
    revolve(axis=Axis((-50.673, 7.62, 41.275), (1, 0, 0)), mode=Mode.SUBTRACT)
    with BuildSketch(Plane(origin=(46.99, 39.37, 41.275), x_dir=(0, 1, 0), z_dir=(0, 0, 1))) as chamfer1_piece_19:
        with BuildLine():
            Line((5.532842049, -0.071842049), (2.849157951, 2.611842049))
            Line((2.849157951, 2.611842049), (2.798357951, 2.611842049))
            ThreePointArc((2.798357951, 2.611842049), (2.8702, 1.305921024), (2.8702, 0))
            Line((2.8702, 0), (2.921, -0.0508))
            ThreePointArc((2.921, -0.0508), (4.226921024, -0.0508), (5.532842049, -0.122642049))
            Line((5.532842049, -0.122642049), (5.532842049, -0.071842049))
        make_face()
    revolve(axis=Axis((46.99, 39.37, 41.275), (-1, 0, 0)), mode=Mode.SUBTRACT)
    with BuildSketch(Plane(origin=(-50.673, 39.37, 41.275), x_dir=(0, 1, 0), z_dir=(0, 0, -1))) as chamfer1_piece_20:
        with BuildLine():
            Line((5.532842049, -0.071842049), (2.849157951, 2.611842049))
            Line((2.849157951, 2.611842049), (2.798357951, 2.611842049))
            ThreePointArc((2.798357951, 2.611842049), (2.8702, 1.305921024), (2.8702, 0))
            Line((2.8702, 0), (2.921, -0.0508))
            ThreePointArc((2.921, -0.0508), (4.226921024, -0.0508), (5.532842049, -0.122642049))
            Line((5.532842049, -0.122642049), (5.532842049, -0.071842049))
        make_face()
    revolve(axis=Axis((-50.673, 39.37, 41.275), (1, 0, 0)), mode=Mode.SUBTRACT)
    with BuildSketch(Plane(origin=(-97.4725, 23.495, 50.8), x_dir=(1, 0, 0), z_dir=(0, -1, 0))) as chamfer1_piece_21:
        with BuildLine():
            Line((9.215842049, -0.071842049), (6.532157951, 2.611842049))
            Line((6.532157951, 2.611842049), (6.481357951, 2.611842049))
            ThreePointArc((6.481357951, 2.611842049), (6.5532, 1.305921024), (6.5532, 0))
            Line((6.5532, 0), (6.604, -0.0508))
            ThreePointArc((6.604, -0.0508), (7.909921024, -0.0508), (9.215842049, -0.122642049))
            Line((9.215842049, -0.122642049), (9.215842049, -0.071842049))
        make_face()
    revolve(axis=Axis((-97.4725, 23.495, 50.8), (0, 0, 1)), mode=Mode.SUBTRACT)


solid = part.part
